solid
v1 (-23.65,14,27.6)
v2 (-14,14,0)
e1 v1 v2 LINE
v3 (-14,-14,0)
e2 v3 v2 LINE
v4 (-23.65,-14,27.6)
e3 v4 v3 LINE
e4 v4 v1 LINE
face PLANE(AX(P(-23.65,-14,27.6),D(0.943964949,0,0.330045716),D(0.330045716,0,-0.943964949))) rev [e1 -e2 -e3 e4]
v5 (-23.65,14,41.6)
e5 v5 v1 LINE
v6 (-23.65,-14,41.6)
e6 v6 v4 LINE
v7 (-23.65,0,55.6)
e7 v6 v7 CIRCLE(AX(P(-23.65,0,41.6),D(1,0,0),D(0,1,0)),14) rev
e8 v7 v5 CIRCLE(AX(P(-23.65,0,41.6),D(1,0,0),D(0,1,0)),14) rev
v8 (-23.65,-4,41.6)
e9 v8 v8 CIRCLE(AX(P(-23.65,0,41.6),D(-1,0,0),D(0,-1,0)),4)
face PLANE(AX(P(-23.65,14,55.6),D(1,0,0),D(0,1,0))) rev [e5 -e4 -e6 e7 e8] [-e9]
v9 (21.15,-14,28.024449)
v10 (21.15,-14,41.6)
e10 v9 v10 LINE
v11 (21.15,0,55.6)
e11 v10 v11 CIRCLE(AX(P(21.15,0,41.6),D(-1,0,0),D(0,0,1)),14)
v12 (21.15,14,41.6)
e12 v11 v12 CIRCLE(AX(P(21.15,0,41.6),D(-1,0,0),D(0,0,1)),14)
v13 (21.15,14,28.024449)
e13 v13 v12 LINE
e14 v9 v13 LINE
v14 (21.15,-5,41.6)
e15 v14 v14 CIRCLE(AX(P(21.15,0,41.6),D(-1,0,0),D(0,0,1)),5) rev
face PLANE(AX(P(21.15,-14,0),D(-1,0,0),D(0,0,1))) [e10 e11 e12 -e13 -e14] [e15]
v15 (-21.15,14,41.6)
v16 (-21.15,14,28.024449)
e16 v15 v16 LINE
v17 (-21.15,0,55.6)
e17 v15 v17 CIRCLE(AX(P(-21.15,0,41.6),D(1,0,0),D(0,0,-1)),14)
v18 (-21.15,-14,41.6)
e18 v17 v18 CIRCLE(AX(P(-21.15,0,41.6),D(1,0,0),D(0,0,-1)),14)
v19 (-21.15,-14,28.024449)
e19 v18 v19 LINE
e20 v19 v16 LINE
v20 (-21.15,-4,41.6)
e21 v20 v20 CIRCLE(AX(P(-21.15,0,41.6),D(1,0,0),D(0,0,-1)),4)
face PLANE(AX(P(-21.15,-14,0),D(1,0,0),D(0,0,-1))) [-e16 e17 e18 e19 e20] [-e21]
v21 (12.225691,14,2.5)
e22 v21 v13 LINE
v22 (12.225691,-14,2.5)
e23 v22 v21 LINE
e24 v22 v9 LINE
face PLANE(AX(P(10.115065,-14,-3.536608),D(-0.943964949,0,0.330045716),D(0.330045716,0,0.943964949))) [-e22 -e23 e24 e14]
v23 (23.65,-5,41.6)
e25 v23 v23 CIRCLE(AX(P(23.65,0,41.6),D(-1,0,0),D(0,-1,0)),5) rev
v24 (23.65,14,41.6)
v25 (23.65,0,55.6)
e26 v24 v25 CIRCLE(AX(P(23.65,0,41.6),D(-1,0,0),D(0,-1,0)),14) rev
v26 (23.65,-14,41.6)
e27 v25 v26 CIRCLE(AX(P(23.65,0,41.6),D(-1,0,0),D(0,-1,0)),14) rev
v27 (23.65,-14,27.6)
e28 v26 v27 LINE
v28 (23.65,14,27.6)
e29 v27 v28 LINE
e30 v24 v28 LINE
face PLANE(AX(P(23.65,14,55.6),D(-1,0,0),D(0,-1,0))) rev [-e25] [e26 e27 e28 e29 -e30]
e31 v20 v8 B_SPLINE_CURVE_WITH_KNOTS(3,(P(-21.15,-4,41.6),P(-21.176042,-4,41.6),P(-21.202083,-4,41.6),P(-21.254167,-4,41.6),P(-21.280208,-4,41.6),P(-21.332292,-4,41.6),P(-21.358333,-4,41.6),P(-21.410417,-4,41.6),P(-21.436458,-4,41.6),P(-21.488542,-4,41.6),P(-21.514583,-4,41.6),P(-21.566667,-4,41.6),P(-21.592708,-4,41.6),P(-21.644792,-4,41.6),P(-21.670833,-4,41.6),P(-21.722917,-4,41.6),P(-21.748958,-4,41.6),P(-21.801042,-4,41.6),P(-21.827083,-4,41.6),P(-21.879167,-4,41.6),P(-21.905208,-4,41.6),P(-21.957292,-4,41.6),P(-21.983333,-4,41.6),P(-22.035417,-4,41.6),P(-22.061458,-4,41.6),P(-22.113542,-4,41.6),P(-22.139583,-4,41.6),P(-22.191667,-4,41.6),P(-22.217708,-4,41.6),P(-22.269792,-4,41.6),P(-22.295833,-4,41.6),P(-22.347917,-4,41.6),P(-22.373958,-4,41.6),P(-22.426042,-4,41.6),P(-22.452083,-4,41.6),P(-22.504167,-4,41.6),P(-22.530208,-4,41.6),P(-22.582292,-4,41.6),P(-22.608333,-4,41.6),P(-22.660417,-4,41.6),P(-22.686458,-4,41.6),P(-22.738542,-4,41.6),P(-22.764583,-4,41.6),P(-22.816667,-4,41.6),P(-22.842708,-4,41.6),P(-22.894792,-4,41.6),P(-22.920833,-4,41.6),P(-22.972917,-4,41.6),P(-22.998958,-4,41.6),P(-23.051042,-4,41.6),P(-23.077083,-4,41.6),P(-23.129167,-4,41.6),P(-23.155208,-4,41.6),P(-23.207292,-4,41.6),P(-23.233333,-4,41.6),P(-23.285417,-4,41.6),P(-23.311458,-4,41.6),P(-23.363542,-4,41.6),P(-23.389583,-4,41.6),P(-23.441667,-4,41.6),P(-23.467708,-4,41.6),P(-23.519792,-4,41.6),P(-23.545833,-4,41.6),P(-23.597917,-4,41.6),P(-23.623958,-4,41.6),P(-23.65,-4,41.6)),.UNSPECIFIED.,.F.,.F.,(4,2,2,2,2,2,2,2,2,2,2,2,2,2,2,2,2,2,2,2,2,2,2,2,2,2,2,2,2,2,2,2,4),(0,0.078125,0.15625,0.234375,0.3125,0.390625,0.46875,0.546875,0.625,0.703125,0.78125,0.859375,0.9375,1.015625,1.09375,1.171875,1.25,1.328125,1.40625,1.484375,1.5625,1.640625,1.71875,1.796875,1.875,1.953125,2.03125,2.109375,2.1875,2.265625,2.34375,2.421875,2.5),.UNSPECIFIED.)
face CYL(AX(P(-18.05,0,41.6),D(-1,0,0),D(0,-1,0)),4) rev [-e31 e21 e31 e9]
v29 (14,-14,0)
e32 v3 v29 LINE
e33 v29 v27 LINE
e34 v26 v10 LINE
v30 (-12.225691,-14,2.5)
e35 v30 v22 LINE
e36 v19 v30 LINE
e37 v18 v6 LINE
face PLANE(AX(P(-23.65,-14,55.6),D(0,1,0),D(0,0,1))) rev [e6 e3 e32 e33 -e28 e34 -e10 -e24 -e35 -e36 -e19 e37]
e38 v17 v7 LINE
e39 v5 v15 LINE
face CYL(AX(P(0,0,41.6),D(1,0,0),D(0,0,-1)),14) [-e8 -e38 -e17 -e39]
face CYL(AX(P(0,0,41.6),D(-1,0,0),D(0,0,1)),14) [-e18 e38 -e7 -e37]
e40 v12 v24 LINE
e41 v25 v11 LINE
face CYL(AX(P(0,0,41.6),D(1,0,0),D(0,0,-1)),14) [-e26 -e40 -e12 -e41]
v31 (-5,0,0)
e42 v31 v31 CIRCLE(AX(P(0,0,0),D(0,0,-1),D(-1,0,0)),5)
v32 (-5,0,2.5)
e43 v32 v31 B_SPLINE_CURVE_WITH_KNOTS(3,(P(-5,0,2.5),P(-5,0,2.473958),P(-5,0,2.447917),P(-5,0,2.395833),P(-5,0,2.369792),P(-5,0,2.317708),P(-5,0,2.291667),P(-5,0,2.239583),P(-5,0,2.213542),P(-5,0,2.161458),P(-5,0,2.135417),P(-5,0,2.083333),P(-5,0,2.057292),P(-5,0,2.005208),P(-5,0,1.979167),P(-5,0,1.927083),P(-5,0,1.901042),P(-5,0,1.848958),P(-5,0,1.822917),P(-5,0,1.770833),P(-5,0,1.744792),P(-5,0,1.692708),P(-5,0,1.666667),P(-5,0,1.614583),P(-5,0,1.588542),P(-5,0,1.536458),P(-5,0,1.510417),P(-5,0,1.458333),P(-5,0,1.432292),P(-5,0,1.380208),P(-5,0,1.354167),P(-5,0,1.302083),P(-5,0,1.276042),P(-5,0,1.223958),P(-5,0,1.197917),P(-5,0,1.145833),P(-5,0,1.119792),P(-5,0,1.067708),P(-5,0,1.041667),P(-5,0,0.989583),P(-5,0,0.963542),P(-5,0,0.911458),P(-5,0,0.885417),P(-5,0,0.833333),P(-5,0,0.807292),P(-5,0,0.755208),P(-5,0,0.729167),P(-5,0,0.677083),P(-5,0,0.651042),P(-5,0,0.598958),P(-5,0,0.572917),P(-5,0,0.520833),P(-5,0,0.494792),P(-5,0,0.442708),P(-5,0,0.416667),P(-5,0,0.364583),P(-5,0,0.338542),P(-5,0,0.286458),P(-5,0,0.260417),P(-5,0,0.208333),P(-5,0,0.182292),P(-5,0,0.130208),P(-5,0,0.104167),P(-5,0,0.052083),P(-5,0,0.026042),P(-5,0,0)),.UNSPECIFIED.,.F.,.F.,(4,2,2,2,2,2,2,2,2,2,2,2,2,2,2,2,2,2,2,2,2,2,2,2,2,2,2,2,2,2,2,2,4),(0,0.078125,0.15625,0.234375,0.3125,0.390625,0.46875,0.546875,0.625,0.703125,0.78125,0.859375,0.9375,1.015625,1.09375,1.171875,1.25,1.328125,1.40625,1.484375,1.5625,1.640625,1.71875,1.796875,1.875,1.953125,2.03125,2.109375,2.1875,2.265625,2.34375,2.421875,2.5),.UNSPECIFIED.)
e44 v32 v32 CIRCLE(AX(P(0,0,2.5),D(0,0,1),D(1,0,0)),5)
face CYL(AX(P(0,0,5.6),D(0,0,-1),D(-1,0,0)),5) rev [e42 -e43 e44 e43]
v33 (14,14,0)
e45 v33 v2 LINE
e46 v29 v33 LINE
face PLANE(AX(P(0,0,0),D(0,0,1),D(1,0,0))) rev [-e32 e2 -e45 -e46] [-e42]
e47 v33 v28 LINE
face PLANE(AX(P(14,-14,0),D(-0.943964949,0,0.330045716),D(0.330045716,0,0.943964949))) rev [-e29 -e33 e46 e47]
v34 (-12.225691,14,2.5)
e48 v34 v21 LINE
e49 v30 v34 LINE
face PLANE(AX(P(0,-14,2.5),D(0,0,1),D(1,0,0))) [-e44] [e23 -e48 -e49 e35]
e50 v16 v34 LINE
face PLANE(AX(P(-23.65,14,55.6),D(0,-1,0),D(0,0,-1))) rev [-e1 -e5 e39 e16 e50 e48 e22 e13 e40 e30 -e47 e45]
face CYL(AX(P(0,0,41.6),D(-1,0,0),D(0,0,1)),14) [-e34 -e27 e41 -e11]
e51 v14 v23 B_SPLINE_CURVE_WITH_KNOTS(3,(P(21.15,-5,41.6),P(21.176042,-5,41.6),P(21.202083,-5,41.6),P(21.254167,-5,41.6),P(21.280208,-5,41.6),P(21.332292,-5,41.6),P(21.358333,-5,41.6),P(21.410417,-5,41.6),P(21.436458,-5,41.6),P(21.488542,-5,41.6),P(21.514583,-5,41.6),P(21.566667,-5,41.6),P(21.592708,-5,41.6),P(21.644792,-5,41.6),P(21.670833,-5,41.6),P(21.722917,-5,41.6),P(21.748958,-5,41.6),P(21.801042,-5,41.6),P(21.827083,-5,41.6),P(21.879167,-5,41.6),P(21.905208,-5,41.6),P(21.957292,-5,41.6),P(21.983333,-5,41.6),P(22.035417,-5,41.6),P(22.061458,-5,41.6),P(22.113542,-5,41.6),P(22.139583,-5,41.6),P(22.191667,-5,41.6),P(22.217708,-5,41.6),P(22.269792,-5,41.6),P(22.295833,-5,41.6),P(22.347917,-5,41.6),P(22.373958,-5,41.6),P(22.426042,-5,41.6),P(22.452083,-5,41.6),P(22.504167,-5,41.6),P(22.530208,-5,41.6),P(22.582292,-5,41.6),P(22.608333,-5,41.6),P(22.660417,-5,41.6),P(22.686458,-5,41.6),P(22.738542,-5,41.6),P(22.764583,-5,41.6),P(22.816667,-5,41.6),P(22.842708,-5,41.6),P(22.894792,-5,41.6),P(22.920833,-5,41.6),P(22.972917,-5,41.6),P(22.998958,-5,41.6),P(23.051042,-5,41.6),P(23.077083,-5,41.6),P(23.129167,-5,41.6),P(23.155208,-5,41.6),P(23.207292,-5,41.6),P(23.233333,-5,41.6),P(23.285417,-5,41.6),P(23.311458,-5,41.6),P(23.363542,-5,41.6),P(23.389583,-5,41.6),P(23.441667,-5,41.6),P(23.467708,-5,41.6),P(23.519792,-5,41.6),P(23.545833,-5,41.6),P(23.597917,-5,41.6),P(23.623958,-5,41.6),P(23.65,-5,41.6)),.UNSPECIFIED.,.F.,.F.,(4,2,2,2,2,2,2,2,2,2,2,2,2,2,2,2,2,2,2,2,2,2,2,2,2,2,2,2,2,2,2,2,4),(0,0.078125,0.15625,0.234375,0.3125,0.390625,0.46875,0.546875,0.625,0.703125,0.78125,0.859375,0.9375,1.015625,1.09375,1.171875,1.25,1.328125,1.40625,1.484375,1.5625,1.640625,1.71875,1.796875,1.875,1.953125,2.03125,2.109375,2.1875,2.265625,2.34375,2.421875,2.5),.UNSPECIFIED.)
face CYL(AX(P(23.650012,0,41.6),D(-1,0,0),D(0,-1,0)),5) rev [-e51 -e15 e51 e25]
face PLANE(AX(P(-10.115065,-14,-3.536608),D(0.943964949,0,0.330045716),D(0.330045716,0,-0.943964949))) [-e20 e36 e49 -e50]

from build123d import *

# Parameters (mm, degrees)
ESBO_O1_W                  = 47.3
ESBO_O1_H                  = 28
RESSALTO_EXTRUS_O1_DEPTH   = 55.6
CORTE_EXTRUS_O1_DEPTH      = 67.593411836
CORTE_EXTRUS_O2_DEPTH      = 67.593411836
CORTE_EXTRUS_O3_DEPTH      = 75.327989345
CORTE_EXTRUS_O3_DEPTH_BACK = 5.6
ESBO_O4_R                  = 5
ESBO_O5_R                  = 4
CORTE_EXTRUS_O6_DEPTH      = 5.6
FILETE1_R                  = 14
FILETE2_R                  = 14
ESBO_O6_R                  = 5
CORTE_EXTRUS_O7_DEPTH      = 5.6


with BuildPart() as part:
    # Esboço1 → Ressalto-extrusão1 (new body)
    with BuildSketch(Plane.XY):
        Rectangle(ESBO_O1_W, ESBO_O1_H)
    extrude(amount=RESSALTO_EXTRUS_O1_DEPTH)

    # Esboço2 → Corte-extrusão1 (cut, through all)
    with BuildSketch(Plane(origin=(0, 14, 0), x_dir=(1, 0, 0), z_dir=(0, 1, 0))):
        Polygon((-23.65, -27.6), (-23.65, 0), (-14, 0), align=None)
        Polygon((14, 0), (23.65, 0), (23.65, -27.6), align=None)
    extrude(amount=-CORTE_EXTRUS_O1_DEPTH, mode=Mode.SUBTRACT)

    # Esboço3 → Corte-extrusão2 (cut, through all)
    with BuildSketch(Plane(origin=(0, 14, 0), x_dir=(1, 0, 0), z_dir=(0, 1, 0))):
        Polygon((-21.15, -28.02444916), (-21.15, -55.6), (21.15, -55.6), (21.15, -28.02444916), (12.225690783, -2.5), (-12.225690783, -2.5), align=None)
    extrude(amount=-CORTE_EXTRUS_O2_DEPTH, mode=Mode.SUBTRACT)

    # Esboço4 → Corte-extrusão3 (cut, two sides: drawn at the far end of the back side and taken through both)
    with BuildSketch(Plane(origin=(23.65, 0, 0), x_dir=(0, 0, -1), z_dir=(1, 0, 0)).offset(-CORTE_EXTRUS_O3_DEPTH_BACK)):
        with Locations(Location((-41.6, 0, 0), (0, 0, 270))):
            Circle(ESBO_O4_R)
    extrude(amount=CORTE_EXTRUS_O3_DEPTH + CORTE_EXTRUS_O3_DEPTH_BACK, mode=Mode.SUBTRACT)

    # Esboço5 → Corte-extrusão6 (cut)
    with BuildSketch(Plane.ZY.offset(23.65)):
        with Locations(Location((41.6, 0, 0), (0, 0, 270))):
            Circle(ESBO_O5_R)
    extrude(amount=-CORTE_EXTRUS_O6_DEPTH, mode=Mode.SUBTRACT)

    # Filete1
    filete1_edges = [part.edges().sort_by_distance(p)[0] for p in [
        (-22.4, -14, 55.6),
        (-22.4, 14, 55.6),
    ]]
    fillet(filete1_edges, radius=FILETE1_R - 0.0001)  # a hair under: the kernel refuses the full size

    # Filete2
    filete2_edges = [part.edges().sort_by_distance(p)[0] for p in [
        (22.4, -14, 55.6),
        (22.4, 14, 55.6),
    ]]
    fillet(filete2_edges, radius=FILETE2_R - 0.0001)  # a hair under: the kernel refuses the full size

    # Esboço6 → Corte-extrusão7 (cut)
    with BuildSketch(Plane(origin=(0, 0, 0), x_dir=(-1, 0, 0), z_dir=(0, 0, -1))):
        Circle(ESBO_O6_R)
    extrude(amount=-CORTE_EXTRUS_O7_DEPTH, mode=Mode.SUBTRACT)


solid = part.part
